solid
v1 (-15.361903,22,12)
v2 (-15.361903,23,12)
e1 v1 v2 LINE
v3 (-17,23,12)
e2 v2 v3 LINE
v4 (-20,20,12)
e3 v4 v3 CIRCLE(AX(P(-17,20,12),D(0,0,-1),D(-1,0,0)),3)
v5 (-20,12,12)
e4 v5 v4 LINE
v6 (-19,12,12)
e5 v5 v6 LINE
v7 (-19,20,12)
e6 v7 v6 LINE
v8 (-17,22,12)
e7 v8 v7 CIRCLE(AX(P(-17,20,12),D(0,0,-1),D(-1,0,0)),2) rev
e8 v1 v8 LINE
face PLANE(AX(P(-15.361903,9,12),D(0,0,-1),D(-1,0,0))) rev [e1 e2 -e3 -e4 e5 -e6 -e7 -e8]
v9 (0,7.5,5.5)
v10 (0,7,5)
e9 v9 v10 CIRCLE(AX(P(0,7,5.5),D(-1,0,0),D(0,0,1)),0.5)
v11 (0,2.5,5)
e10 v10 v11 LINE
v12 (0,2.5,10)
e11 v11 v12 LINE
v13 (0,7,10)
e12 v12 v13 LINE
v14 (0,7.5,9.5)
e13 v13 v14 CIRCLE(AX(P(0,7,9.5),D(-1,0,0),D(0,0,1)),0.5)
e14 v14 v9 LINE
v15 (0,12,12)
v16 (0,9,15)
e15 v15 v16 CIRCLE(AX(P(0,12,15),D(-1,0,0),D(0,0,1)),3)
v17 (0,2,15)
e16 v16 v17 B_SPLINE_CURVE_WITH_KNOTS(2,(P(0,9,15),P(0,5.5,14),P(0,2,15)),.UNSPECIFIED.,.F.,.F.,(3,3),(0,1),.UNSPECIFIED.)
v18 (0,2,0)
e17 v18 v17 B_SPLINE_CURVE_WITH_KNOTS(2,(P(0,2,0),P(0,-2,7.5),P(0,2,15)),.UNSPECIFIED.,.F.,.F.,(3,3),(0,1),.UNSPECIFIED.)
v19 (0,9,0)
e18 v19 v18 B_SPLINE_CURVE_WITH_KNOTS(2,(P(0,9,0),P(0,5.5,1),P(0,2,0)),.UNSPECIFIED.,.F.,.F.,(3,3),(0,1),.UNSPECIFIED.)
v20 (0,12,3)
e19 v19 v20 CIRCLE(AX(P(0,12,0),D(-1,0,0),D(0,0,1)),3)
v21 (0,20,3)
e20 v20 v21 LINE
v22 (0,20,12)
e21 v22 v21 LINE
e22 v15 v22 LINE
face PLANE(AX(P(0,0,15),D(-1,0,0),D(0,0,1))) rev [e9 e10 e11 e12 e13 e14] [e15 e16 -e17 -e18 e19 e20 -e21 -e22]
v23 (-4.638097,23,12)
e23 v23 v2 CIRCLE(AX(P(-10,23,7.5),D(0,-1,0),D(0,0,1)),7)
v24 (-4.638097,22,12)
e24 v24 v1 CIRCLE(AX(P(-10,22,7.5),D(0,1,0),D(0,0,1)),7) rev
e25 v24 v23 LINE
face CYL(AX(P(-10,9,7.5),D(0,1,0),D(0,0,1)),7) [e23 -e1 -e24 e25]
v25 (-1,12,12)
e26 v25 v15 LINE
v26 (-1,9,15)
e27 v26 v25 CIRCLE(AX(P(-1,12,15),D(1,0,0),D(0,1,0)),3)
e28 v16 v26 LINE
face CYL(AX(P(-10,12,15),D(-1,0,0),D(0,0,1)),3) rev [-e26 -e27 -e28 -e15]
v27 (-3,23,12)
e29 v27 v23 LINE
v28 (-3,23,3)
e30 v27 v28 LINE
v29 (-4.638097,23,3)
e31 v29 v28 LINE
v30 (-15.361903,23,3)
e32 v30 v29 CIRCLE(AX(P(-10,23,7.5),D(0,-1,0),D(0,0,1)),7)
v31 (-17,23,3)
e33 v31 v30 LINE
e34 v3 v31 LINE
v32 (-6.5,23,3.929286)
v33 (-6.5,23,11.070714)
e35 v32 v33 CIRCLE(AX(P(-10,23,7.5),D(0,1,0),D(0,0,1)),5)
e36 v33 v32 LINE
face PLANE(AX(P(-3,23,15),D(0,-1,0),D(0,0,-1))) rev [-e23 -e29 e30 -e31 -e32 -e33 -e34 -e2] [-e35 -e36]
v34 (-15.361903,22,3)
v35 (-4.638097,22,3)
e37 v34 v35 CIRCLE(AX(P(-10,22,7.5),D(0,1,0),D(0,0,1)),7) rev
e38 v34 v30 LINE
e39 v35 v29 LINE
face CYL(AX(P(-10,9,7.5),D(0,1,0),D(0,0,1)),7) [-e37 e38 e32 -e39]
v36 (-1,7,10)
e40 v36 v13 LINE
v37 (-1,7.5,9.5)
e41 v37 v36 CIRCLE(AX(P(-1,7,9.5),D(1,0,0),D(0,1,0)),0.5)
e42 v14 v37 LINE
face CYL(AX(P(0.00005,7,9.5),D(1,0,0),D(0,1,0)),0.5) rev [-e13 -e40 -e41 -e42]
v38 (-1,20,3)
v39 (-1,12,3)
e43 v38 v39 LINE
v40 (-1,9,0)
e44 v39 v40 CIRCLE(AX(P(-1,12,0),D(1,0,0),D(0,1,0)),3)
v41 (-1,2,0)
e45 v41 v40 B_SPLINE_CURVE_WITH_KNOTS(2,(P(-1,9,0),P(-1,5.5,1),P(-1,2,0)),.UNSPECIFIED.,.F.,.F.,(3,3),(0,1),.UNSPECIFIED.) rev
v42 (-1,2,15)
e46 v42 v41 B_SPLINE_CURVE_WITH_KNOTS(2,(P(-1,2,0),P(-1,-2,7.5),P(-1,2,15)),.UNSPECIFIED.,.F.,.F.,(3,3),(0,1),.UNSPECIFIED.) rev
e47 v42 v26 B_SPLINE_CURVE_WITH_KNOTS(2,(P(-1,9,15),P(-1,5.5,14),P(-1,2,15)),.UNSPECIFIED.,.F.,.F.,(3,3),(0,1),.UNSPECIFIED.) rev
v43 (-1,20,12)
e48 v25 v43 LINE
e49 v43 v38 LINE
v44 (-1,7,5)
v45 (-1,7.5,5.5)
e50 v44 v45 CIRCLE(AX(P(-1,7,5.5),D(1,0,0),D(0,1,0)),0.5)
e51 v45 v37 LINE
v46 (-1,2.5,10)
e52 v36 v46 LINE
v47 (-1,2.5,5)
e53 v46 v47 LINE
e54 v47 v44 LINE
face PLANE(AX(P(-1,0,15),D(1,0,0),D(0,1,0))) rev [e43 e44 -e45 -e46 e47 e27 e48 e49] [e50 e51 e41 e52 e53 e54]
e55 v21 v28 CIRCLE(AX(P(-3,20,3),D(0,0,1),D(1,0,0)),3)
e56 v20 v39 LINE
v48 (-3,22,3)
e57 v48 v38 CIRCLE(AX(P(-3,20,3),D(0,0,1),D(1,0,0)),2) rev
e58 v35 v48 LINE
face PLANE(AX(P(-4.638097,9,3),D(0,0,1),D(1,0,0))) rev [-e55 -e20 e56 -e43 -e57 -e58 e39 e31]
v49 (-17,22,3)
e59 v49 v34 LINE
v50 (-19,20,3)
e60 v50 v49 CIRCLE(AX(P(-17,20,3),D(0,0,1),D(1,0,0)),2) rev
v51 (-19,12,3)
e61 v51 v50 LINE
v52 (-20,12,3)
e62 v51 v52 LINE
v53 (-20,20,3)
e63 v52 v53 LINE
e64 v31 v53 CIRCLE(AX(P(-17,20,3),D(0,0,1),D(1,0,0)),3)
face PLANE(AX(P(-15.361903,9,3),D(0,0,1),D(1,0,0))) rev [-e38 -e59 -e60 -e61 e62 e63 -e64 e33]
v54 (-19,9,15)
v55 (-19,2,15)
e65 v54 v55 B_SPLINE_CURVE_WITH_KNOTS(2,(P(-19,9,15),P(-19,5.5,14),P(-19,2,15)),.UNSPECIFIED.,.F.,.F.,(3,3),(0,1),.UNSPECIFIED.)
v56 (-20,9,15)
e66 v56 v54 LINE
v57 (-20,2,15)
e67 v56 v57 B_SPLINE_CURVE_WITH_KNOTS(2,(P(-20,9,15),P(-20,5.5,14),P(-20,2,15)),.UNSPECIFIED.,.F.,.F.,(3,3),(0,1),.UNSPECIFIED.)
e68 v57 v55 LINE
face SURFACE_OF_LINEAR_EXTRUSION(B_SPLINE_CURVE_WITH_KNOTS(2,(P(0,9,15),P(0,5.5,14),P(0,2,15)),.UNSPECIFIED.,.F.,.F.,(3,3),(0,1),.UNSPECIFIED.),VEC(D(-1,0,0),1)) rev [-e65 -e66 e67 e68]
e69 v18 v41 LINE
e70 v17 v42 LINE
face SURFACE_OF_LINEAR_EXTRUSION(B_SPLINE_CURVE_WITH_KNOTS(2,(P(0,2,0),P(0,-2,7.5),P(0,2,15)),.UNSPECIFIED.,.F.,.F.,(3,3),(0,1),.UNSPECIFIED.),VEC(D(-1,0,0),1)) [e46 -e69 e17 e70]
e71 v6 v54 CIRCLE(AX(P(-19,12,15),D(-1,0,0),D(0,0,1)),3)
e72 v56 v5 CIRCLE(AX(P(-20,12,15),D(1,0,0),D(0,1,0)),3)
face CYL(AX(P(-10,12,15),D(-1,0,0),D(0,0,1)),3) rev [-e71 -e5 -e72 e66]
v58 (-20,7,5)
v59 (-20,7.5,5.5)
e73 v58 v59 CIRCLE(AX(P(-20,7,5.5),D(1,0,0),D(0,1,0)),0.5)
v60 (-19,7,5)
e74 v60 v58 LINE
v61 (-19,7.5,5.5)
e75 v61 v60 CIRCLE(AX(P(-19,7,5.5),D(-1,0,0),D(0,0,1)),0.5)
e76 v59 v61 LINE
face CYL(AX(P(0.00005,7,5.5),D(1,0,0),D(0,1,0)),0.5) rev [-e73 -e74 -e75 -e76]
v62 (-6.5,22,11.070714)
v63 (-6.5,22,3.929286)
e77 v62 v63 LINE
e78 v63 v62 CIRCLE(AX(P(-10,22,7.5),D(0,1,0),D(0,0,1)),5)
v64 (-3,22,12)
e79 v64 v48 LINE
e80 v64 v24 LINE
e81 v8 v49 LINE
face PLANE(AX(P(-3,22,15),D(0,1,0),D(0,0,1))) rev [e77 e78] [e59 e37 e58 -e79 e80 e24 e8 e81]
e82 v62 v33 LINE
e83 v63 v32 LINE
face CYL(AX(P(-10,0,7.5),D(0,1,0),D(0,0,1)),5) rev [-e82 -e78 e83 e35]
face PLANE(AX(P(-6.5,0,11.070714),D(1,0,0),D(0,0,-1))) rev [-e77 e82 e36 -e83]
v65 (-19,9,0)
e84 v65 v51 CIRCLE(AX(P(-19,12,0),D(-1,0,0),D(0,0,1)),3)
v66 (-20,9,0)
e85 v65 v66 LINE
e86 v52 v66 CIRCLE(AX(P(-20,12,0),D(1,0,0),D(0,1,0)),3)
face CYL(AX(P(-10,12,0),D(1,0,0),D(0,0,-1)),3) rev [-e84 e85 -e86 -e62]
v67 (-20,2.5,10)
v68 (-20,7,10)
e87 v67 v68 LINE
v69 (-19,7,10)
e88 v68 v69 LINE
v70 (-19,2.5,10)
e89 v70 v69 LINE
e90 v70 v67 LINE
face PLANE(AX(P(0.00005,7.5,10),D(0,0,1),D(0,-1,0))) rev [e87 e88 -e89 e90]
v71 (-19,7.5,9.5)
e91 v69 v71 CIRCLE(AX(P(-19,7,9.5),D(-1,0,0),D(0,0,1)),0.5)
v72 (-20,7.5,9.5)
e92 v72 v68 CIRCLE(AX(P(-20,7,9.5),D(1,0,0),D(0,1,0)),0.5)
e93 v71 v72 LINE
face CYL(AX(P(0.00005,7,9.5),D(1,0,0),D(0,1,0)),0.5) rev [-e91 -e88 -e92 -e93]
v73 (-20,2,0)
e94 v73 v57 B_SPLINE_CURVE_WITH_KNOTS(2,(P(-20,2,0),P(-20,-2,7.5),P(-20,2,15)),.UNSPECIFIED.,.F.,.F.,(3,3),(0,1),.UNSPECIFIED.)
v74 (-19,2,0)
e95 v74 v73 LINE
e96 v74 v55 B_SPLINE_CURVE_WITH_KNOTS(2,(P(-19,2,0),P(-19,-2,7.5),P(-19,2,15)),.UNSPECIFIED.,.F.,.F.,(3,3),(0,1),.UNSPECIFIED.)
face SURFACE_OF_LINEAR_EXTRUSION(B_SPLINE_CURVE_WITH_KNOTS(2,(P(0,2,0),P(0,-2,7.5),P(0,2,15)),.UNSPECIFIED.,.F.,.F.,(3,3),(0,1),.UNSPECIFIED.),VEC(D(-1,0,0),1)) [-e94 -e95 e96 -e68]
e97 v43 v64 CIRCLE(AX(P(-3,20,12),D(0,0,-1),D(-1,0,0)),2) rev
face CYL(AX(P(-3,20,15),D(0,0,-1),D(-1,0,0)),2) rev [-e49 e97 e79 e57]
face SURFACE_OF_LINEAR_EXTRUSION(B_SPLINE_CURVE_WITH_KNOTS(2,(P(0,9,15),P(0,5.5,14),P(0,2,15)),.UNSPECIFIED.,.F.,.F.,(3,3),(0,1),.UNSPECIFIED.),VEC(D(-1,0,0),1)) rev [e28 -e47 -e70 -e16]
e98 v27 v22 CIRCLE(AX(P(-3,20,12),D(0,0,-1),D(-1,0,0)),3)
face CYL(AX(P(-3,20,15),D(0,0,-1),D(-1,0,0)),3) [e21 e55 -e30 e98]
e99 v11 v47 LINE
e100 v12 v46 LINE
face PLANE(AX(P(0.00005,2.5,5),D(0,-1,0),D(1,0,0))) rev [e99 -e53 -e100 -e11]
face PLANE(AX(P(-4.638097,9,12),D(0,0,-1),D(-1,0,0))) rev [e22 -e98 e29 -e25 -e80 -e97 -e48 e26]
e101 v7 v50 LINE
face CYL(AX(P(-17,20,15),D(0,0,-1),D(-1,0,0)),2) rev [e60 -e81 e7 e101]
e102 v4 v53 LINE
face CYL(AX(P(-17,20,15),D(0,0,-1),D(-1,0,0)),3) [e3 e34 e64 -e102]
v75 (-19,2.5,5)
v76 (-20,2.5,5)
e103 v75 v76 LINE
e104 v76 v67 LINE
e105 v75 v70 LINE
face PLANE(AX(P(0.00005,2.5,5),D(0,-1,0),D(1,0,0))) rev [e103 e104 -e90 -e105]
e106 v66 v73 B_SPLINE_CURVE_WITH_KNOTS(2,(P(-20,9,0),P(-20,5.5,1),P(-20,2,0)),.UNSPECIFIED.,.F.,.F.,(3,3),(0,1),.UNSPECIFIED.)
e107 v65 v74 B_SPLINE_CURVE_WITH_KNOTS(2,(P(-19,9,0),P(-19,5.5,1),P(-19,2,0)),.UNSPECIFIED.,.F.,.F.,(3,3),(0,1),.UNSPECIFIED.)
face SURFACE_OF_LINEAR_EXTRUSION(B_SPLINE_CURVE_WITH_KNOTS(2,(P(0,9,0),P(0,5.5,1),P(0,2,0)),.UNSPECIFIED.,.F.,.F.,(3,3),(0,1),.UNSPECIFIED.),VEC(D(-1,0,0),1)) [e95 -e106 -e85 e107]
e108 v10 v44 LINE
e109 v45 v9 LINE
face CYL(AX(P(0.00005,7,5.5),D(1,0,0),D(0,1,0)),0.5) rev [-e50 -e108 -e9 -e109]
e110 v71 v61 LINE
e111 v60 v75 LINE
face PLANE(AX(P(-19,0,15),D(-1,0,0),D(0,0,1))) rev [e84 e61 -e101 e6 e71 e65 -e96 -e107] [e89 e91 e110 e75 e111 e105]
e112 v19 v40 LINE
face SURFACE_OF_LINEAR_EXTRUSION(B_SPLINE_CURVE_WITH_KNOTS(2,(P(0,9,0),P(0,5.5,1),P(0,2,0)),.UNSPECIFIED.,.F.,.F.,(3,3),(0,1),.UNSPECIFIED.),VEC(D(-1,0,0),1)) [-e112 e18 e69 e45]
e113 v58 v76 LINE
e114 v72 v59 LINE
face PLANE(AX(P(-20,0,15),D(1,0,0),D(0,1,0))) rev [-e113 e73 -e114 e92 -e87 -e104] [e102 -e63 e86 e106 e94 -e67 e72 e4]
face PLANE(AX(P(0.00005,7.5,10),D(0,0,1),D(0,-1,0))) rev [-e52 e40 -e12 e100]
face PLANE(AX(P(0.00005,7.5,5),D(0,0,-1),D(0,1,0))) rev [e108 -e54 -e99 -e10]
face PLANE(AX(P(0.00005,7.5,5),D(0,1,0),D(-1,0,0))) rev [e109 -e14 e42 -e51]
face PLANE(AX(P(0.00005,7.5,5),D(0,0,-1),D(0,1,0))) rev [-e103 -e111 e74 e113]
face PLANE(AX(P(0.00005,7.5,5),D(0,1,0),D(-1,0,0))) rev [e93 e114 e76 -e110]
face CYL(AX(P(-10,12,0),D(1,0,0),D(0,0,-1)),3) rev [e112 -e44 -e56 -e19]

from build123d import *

# Parameters (mm, degrees)
BOSS_EXTRUDE1_DEPTH = 15
CUT_EXTRUDE2_DEPTH  = 34.970575503
CUT_EXTRUDE3_DEPTH  = 14
CUT_EXTRUDE4_DEPTH  = 34.970575503
CUT_EXTRUDE5_DEPTH  = 34.970575606
FILLET1_R           = 3
FILLET2_R           = 3
SKETCH7_W           = 5
SKETCH7_H           = 5
CUT_EXTRUDE6_DEPTH  = 34.970575606
FILLET3_R           = 0.5


with BuildPart() as part:
    # Sketch1 → Boss-Extrude1 (new body)
    with BuildSketch(Plane.XY):
        with BuildLine():
            Line((-19, 0), (-19, 20))
            ThreePointArc((-19, 20), (-18.414213562, 21.414213562), (-17, 22))
            Line((-17, 22), (-3, 22))
            ThreePointArc((-3, 22), (-1.585786438, 21.414213562), (-1, 20))
            Line((-1, 20), (-1, 0))
            Line((-1, 0), (0, 0))
            Line((0, 0), (0, 20))
            ThreePointArc((0, 20), (-0.878679656, 22.121320344), (-3, 23))
            Line((-3, 23), (-17, 23))
            ThreePointArc((-17, 23), (-19.121320344, 22.121320344), (-20, 20))
            Line((-20, 20), (-20, 0))
            Line((-20, 0), (-19, 0))
        make_face()
    extrude(amount=BOSS_EXTRUDE1_DEPTH)

    # Sketch2 → Cut-Extrude2 (cut, through all)
    with BuildSketch(Plane(origin=(0, 23, 0), x_dir=(1, 0, 0), z_dir=(0, 1, 0))):
        with BuildLine():
            Line((-6.5, -11.070714214), (-6.5, -3.929285786))
            ThreePointArc((-6.5, -3.929285786), (-15, -7.5), (-6.5, -11.070714214))
        make_face()
    extrude(amount=-CUT_EXTRUDE2_DEPTH, mode=Mode.SUBTRACT)

    # Sketch4 → Cut-Extrude3 (cut)
    with BuildSketch(Plane(origin=(0, 23, 0), x_dir=(1, 0, 0), z_dir=(0, 1, 0))):
        with BuildLine():
            Line((-4.638097353, -12), (0, -12))
            Line((0, -12), (0, -15))
            Line((0, -15), (-20, -15))
            Line((-20, -15), (-20, -12))
            Line((-20, -12), (-15.361902647, -12))
            ThreePointArc((-15.361902647, -12), (-10, -14.5), (-4.638097353, -12))
        make_face()
        with BuildLine():
            Line((-4.638097353, -3), (0, -3))
            Line((0, -3), (0, 0))
            Line((0, 0), (-20, 0))
            Line((-20, 0), (-20, -3))
            Line((-20, -3), (-15.361902647, -3))
            ThreePointArc((-15.361902647, -3), (-10, -0.5), (-4.638097353, -3))
        make_face()
    extrude(amount=-CUT_EXTRUDE3_DEPTH, mode=Mode.SUBTRACT)

    # Sketch5 → Cut-Extrude4 (cut, through all)
    with BuildSketch(Plane.ZY.offset(20)):
        with BuildLine():
            Line((0, 2), (0, 0))
            Line((0, 0), (7.5, 0))
            add(Edge.make_bspline(
                [(0, 2), (3.75, 0), (7.5, 0)],
                knots=[0, 0, 0, 0.5, 0.5, 0.5], degree=2))
        make_face()
        with BuildLine():
            add(Edge.make_bspline(
                [(7.5, 0), (11.25, 0), (15, 2)],
                knots=[0.5, 0.5, 0.5, 1, 1, 1], degree=2))
            Line((7.5, 0), (15, 0))
            Line((15, 0), (15, 2))
        make_face()
    extrude(amount=-CUT_EXTRUDE4_DEPTH, mode=Mode.SUBTRACT)

    # Sketch6 → Cut-Extrude5 (cut, through all)
    with BuildSketch(Plane.ZY.offset(20)):
        with BuildLine():
            Line((0, 9), (0, 5.5))
            Line((0, 5.5), (0.5, 5.5))
            add(Edge.make_bspline(
                [(0, 9), (0.5, 7.25), (0.5, 5.5)],
                knots=[0, 0, 0, 0.5, 0.5, 0.5], degree=2))
        make_face()
        with BuildLine():
            Line((0.5, 5.5), (0, 5.5))
            Line((0, 5.5), (0, 2))
            add(Edge.make_bspline(
                [(0.5, 5.5), (0.5, 3.75), (0, 2)],
                knots=[0.5, 0.5, 0.5, 1, 1, 1], degree=2))
        make_face()
        with BuildLine():
            Line((15, 9), (15, 2))
            add(Edge.make_bspline(
                [(15, 9), (14, 5.5), (15, 2)],
                knots=[0, 0, 0, 1, 1, 1], degree=2))
        make_face()
    extrude(amount=-CUT_EXTRUDE5_DEPTH, mode=Mode.SUBTRACT)

    # Fillet1
    fillet1_edges = [part.edges().sort_by_distance(p)[0] for p in [
        (-19.5, 9, 3),
    ]]
    fillet(fillet1_edges, radius=FILLET1_R - 0.0001)  # a hair under: the kernel refuses the full size

    # Fillet2
    fillet2_edges = [part.edges().sort_by_distance(p)[0] for p in [
        (-0.5, 9, 3),
        (-0.5, 9, 12),
        (-19.5, 9, 12),
    ]]
    fillet(fillet2_edges, radius=FILLET2_R - 0.0001)  # a hair under: the kernel refuses the full size

    # Sketch7 → Cut-Extrude6 (cut, through all)
    with BuildSketch(Plane.ZY.offset(20)):
        with Locations((7.5, 5)):
            Rectangle(SKETCH7_W, SKETCH7_H)
    extrude(amount=-CUT_EXTRUDE6_DEPTH, mode=Mode.SUBTRACT)

    # Fillet3
    fillet3_edges = [part.edges().sort_by_distance(p)[0] for p in [
        (-0.5, 7.5, 5),
        (-19.5, 7.5, 5),
        (-0.5, 7.5, 10),
        (-19.5, 7.5, 10),
    ]]
    fillet(fillet3_edges, radius=FILLET3_R)


solid = part.part
